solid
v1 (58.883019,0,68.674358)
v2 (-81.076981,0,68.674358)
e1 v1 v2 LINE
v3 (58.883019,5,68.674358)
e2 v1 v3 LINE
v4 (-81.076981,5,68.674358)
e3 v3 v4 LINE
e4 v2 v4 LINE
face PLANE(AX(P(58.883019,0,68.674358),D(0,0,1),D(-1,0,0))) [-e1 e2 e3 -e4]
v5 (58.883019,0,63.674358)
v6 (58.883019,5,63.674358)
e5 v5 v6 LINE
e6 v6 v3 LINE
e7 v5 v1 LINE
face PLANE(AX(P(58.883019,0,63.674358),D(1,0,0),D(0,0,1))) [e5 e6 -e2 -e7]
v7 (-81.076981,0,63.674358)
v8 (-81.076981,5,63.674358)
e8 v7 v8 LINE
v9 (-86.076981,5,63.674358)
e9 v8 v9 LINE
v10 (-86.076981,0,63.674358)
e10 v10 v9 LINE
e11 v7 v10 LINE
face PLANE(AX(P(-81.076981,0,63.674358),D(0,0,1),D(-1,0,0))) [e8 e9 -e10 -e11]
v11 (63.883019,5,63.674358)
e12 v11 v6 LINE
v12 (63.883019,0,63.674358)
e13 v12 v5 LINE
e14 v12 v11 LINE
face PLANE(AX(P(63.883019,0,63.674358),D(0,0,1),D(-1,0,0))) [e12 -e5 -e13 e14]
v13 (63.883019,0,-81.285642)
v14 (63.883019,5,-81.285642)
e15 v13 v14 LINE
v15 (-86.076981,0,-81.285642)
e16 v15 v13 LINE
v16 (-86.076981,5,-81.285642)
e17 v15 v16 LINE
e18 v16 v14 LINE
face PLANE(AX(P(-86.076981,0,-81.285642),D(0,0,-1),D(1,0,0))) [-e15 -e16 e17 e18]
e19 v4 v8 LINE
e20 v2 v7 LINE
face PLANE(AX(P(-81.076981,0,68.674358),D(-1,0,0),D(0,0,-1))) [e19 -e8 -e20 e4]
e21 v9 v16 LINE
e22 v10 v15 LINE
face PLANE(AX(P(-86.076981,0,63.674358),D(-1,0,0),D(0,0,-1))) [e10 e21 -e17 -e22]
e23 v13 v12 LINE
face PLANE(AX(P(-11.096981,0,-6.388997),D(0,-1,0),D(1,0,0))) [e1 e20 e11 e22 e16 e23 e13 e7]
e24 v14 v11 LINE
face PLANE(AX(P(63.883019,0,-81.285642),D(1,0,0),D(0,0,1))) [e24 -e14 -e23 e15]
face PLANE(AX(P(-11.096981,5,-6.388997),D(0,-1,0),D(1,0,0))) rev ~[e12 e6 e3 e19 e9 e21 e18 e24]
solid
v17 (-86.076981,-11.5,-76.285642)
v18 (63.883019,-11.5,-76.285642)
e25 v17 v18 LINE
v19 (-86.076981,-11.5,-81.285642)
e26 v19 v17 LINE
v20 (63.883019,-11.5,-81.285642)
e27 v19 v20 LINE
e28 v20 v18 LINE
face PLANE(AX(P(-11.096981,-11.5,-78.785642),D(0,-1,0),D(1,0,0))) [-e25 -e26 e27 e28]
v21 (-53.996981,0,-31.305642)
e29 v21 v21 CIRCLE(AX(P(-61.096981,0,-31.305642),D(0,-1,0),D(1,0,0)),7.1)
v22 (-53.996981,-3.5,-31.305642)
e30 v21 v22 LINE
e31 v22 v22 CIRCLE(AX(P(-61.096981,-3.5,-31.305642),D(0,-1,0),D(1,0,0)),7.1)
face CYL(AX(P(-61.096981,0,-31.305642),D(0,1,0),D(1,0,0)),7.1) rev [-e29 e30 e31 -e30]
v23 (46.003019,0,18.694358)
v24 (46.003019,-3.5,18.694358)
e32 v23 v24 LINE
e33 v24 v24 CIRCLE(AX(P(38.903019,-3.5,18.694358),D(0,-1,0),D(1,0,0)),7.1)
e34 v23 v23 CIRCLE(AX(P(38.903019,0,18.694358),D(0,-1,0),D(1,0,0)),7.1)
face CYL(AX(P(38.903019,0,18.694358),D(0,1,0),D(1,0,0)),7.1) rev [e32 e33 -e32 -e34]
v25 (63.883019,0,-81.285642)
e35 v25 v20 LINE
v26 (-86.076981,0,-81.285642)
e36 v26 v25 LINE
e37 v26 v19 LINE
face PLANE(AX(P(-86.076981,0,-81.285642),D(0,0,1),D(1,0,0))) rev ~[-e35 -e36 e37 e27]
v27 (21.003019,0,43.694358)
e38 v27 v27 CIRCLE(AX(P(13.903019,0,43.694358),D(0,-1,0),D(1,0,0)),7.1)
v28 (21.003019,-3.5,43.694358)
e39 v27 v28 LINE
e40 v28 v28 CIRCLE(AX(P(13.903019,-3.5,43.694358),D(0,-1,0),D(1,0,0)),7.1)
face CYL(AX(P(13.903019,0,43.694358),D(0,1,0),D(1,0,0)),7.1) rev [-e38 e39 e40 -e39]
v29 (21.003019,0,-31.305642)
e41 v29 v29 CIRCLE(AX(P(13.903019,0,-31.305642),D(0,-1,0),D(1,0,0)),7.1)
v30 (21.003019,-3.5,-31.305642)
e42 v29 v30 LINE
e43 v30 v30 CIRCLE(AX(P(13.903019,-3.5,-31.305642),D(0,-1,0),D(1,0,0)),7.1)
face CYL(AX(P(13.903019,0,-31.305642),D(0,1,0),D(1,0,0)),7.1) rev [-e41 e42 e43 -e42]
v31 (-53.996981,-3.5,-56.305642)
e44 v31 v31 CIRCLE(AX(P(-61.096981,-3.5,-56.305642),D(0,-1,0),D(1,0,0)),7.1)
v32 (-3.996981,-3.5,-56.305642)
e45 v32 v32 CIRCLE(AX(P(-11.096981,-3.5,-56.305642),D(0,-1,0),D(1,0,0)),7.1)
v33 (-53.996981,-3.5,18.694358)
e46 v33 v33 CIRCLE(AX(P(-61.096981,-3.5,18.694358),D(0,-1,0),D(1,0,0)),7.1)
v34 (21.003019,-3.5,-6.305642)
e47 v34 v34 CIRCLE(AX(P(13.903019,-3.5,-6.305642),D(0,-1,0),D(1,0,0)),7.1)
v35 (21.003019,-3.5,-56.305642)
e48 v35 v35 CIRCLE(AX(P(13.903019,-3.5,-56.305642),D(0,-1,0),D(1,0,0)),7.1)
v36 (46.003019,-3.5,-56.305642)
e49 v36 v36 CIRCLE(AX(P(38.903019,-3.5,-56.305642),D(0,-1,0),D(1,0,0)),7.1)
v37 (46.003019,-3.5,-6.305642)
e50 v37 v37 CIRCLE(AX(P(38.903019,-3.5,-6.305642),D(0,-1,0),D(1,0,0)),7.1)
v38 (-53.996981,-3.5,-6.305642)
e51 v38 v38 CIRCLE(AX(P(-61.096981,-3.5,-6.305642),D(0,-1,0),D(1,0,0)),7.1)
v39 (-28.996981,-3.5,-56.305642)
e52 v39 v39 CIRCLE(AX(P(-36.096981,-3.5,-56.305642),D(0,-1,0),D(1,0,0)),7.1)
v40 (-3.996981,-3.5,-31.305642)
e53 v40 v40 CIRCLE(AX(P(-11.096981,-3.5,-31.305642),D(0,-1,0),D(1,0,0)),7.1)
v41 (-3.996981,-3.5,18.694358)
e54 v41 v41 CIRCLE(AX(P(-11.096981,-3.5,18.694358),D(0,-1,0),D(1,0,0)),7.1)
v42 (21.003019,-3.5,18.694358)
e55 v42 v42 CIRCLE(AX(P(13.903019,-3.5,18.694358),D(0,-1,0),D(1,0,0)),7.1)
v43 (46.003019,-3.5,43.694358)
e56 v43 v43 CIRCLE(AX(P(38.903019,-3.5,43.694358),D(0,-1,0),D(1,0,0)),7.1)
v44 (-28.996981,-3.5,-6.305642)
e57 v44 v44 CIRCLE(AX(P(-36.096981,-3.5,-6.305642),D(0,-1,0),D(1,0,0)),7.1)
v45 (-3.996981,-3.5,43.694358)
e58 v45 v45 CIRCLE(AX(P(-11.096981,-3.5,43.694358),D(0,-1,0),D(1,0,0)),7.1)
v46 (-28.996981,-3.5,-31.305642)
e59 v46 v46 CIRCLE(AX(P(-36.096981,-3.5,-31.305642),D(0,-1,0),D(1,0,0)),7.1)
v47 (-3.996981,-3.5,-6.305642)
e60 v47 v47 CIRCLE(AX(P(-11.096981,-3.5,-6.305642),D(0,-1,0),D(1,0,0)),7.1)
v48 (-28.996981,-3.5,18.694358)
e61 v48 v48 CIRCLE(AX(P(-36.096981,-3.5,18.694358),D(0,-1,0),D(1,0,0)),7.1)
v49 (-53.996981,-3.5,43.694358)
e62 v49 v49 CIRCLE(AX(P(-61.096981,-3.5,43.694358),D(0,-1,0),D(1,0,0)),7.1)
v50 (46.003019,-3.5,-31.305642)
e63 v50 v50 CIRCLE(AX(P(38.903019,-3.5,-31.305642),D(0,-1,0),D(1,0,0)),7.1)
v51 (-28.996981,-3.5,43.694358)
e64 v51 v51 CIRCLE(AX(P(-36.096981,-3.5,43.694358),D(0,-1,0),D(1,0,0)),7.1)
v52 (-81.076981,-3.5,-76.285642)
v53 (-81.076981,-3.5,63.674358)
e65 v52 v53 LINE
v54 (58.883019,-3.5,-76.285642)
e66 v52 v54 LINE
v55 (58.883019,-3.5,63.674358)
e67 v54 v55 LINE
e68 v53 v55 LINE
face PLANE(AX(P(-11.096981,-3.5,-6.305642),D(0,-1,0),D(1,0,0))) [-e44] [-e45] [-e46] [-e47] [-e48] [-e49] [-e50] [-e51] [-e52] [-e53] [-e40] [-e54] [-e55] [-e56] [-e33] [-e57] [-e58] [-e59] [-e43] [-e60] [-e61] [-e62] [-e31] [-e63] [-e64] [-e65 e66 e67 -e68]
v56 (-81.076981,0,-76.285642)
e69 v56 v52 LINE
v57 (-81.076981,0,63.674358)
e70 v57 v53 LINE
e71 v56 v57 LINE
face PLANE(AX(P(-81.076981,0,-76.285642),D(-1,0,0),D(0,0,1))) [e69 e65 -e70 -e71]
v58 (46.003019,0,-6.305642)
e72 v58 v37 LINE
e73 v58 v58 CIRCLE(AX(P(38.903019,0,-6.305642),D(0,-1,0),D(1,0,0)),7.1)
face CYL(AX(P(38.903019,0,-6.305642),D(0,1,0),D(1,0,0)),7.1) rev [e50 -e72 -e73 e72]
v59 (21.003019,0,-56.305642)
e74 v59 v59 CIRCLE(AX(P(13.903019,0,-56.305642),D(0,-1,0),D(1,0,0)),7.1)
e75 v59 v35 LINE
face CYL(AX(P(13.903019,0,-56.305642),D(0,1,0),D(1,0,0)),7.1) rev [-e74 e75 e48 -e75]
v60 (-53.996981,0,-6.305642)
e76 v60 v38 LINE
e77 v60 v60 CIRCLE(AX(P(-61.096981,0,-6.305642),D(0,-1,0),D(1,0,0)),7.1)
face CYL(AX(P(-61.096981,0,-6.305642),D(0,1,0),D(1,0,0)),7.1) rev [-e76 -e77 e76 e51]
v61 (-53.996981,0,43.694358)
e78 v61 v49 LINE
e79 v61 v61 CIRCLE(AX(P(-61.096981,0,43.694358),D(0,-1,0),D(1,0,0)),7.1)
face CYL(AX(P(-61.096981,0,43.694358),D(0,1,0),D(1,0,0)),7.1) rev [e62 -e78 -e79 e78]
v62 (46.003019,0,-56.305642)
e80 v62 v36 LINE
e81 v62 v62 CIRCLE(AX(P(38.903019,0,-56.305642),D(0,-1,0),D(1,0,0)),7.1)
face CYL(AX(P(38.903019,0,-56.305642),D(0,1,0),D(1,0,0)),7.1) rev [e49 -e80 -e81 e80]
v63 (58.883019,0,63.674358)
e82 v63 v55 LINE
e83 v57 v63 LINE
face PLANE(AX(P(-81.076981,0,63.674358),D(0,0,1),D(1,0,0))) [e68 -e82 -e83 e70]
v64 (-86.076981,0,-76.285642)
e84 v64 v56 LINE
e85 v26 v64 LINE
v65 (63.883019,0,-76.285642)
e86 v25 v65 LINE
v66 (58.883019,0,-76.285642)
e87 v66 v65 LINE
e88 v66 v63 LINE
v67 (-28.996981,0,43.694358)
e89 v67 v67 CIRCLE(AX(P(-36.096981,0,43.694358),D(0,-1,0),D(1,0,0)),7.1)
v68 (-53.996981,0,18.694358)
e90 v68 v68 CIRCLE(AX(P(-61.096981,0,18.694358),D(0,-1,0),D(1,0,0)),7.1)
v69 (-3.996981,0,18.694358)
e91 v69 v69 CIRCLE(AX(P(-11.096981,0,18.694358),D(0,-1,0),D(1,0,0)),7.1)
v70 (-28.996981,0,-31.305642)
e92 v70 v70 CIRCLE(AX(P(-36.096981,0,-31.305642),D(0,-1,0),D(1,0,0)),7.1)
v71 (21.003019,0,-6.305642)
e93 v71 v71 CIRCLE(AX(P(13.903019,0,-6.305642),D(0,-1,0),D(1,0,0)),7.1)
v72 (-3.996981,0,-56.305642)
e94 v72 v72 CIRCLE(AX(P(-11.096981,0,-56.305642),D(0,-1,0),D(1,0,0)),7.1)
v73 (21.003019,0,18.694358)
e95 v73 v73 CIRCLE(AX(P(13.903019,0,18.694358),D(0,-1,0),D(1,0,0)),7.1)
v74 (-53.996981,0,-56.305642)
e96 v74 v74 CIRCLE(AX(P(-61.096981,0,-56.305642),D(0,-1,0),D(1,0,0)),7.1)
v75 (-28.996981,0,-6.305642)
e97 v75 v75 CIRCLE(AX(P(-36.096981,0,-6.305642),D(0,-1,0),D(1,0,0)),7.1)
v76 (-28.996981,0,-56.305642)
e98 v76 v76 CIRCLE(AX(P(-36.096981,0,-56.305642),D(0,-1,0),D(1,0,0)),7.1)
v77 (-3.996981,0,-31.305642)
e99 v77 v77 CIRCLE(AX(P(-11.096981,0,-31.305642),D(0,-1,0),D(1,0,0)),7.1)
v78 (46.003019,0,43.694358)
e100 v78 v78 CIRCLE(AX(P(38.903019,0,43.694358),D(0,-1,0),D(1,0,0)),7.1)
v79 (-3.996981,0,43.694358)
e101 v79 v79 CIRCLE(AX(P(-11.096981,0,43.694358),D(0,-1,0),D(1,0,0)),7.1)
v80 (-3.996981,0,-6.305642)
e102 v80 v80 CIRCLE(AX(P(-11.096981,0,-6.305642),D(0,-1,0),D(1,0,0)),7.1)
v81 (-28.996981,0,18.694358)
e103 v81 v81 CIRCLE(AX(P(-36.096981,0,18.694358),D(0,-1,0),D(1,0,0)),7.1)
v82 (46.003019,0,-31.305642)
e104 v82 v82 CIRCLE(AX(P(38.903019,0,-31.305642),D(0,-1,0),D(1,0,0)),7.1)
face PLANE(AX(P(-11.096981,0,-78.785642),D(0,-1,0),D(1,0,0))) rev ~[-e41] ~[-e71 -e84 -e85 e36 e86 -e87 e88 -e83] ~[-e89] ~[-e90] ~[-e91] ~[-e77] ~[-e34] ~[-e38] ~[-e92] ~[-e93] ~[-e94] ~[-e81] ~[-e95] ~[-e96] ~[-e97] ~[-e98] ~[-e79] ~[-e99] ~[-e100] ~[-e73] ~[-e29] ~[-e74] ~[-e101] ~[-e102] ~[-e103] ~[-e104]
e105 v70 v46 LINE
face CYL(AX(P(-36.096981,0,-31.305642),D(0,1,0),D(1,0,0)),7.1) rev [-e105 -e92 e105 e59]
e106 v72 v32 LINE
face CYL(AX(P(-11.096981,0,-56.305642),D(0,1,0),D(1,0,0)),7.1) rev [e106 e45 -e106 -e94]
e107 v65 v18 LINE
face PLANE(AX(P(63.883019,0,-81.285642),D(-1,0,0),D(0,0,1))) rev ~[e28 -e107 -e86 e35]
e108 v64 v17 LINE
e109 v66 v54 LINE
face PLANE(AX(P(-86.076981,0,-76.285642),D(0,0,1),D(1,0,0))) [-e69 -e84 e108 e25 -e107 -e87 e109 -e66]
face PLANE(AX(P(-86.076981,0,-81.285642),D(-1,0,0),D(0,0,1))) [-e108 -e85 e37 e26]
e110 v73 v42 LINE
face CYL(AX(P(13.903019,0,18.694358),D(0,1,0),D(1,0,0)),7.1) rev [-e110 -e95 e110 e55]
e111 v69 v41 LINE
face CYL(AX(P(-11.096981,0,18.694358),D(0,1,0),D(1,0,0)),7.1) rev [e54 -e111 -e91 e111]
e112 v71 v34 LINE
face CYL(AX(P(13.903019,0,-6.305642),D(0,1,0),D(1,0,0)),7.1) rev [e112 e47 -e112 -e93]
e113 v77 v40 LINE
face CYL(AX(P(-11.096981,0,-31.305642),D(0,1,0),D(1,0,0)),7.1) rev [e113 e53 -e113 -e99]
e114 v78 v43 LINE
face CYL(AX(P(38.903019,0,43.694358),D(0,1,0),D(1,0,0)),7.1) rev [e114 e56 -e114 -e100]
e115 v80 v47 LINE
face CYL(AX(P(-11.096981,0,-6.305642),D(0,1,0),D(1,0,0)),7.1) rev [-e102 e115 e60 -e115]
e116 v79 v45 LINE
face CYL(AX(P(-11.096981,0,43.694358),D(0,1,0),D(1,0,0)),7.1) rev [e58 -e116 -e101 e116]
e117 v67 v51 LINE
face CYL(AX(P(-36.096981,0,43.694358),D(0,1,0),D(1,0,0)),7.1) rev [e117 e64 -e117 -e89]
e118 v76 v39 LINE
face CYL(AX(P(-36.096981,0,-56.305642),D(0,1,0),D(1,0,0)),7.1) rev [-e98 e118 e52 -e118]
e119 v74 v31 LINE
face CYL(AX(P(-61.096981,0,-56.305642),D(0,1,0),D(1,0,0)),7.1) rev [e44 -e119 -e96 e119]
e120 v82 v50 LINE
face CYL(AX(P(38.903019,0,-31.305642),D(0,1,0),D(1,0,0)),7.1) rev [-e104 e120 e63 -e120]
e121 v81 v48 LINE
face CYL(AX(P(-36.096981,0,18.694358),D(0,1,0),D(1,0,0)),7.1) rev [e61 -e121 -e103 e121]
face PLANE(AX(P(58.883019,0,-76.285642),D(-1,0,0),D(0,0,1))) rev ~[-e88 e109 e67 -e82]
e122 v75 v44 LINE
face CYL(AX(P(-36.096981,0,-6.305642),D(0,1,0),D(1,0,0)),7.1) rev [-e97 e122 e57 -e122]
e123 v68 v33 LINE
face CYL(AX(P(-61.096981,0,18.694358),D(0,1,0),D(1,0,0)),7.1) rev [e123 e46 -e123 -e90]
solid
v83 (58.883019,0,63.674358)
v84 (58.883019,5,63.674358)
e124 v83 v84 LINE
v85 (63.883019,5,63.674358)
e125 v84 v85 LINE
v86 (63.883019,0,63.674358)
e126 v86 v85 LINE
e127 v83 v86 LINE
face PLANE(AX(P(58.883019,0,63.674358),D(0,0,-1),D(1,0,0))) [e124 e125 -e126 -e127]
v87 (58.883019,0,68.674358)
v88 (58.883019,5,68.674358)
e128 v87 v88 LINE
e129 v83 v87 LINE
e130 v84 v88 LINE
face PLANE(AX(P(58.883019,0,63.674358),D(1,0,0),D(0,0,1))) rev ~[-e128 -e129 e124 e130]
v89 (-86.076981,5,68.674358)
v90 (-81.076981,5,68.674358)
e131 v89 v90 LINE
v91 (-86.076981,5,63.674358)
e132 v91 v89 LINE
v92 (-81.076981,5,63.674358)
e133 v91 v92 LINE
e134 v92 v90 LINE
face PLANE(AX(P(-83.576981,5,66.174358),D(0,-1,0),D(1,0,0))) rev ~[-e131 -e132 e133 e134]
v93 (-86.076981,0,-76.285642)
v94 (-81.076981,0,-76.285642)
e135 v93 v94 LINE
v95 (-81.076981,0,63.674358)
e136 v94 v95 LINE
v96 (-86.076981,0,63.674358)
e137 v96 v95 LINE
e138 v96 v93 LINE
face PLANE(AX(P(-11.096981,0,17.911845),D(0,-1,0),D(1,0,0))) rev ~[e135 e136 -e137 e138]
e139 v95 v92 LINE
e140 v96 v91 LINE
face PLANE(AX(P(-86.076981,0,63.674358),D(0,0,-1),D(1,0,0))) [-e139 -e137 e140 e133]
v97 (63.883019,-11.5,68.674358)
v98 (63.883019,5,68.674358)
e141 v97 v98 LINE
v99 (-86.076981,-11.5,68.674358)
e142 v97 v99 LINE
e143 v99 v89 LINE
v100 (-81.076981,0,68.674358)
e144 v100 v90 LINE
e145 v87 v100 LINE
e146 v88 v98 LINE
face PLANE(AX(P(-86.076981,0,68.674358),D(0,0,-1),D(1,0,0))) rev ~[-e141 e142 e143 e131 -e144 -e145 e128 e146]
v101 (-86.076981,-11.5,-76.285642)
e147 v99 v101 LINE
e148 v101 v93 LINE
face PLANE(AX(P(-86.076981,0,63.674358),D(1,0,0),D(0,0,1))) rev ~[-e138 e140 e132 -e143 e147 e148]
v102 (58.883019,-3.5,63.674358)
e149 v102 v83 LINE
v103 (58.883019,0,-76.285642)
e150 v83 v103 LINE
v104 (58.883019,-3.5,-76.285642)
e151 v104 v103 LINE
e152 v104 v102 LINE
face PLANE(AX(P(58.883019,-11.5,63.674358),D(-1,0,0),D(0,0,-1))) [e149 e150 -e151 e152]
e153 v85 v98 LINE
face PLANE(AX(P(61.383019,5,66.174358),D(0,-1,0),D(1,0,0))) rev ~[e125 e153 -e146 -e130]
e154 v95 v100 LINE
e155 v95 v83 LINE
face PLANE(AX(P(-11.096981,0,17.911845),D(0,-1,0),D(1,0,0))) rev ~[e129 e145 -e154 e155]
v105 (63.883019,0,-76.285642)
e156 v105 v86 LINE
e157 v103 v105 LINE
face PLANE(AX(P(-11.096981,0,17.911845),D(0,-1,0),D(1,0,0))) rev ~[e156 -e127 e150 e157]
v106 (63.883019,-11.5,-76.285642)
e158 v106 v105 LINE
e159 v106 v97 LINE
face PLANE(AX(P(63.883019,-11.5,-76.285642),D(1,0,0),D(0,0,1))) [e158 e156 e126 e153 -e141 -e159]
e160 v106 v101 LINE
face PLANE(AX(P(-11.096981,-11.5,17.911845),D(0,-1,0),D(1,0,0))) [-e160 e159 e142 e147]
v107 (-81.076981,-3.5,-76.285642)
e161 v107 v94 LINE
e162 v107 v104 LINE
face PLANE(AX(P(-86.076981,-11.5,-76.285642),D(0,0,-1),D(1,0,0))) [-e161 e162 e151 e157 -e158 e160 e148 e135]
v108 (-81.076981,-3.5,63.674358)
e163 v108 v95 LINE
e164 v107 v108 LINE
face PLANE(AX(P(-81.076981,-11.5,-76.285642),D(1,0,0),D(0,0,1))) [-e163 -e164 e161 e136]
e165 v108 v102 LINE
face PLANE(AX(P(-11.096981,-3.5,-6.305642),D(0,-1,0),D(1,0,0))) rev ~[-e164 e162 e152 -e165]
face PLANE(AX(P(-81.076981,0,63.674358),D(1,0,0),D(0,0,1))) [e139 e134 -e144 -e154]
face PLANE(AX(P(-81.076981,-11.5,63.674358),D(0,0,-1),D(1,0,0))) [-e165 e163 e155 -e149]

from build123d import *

# Parameters (mm, degrees)
F0_W      = 139.96
F0_H      = 139.96
F0_R      = 7.1
F1_DEPTH  = 3.5
F3_W      = 139.96
F3_H      = 139.96
F4_DEPTH  = 8
F7_DEPTH  = 11.5
F8_W      = 149.96
F8_H      = 5
F9_DEPTH  = 11.5
F10_W     = 5
F10_H     = 5
F11_DEPTH = 5
F13_DEPTH = 5


with BuildPart() as f1:
    # F0 (on Front) → F1 (new body)
    with BuildSketch(Plane.XZ):
        with Locations((-11.0969811678, -6.305641681)):
            Rectangle(F0_W, F0_H)
        with Locations((-61.0969811678, -56.305641681)):
            Circle(F0_R, mode=Mode.SUBTRACT)
        with Locations((-36.0969811678, -56.305641681)):
            Circle(F0_R, mode=Mode.SUBTRACT)
        with Locations((-61.0969811678, -31.305641681)):
            Circle(F0_R, mode=Mode.SUBTRACT)
        with Locations((-36.0969811678, -31.305641681)):
            Circle(F0_R, mode=Mode.SUBTRACT)
        with Locations((-11.0969811678, -56.305641681)):
            Circle(F0_R, mode=Mode.SUBTRACT)
        with Locations((13.9030188322, -56.305641681)):
            Circle(F0_R, mode=Mode.SUBTRACT)
        with Locations((38.9030188322, -56.305641681)):
            Circle(F0_R, mode=Mode.SUBTRACT)
        with Locations((-11.0969811678, -31.305641681)):
            Circle(F0_R, mode=Mode.SUBTRACT)
        with Locations((13.9030188322, -31.305641681)):
            Circle(F0_R, mode=Mode.SUBTRACT)
        with Locations((38.9030188322, -31.305641681)):
            Circle(F0_R, mode=Mode.SUBTRACT)
        with Locations((-61.0969811678, -6.305641681)):
            Circle(F0_R, mode=Mode.SUBTRACT)
        with Locations((-61.0969811678, 18.694358319)):
            Circle(F0_R, mode=Mode.SUBTRACT)
        with Locations((-36.0969811678, -6.305641681)):
            Circle(F0_R, mode=Mode.SUBTRACT)
        with Locations((-36.0969811678, 18.694358319)):
            Circle(F0_R, mode=Mode.SUBTRACT)
        with Locations((-61.0969811678, 43.694358319)):
            Circle(F0_R, mode=Mode.SUBTRACT)
        with Locations((-36.0969811678, 43.694358319)):
            Circle(F0_R, mode=Mode.SUBTRACT)
        with Locations((-11.0969811678, -6.305641681)):
            Circle(F0_R, mode=Mode.SUBTRACT)
        with Locations((13.9030188322, -6.305641681)):
            Circle(F0_R, mode=Mode.SUBTRACT)
        with Locations((-11.0969811678, 18.694358319)):
            Circle(F0_R, mode=Mode.SUBTRACT)
        with Locations((13.9030188322, 18.694358319)):
            Circle(F0_R, mode=Mode.SUBTRACT)
        with Locations((38.9030188322, -6.305641681)):
            Circle(F0_R, mode=Mode.SUBTRACT)
        with Locations((38.9030188322, 18.694358319)):
            Circle(F0_R, mode=Mode.SUBTRACT)
        with Locations((-11.0969811678, 43.694358319)):
            Circle(F0_R, mode=Mode.SUBTRACT)
        with Locations((13.9030188322, 43.694358319)):
            Circle(F0_R, mode=Mode.SUBTRACT)
        with Locations((38.9030188322, 43.694358319)):
            Circle(F0_R, mode=Mode.SUBTRACT)
    extrude(amount=F1_DEPTH)

    # F8 (on Front) → F9 (join)
    with BuildSketch(Plane.XZ):
        with Locations((-11.0969811678, -78.785641681)):
            Rectangle(F8_W, F8_H)
    extrude(amount=F9_DEPTH)


with BuildPart() as f4:
    # F3 (on offset) → F4 (new body)
    with BuildSketch(Plane.XZ.offset(3.5)):
        with Locations((-11.0969811678, -6.305641681)):
            Rectangle(F3_W, F3_H)
    extrude(amount=F4_DEPTH)

    # F6 (on offset) → F7 (join)
    with BuildSketch(Plane.XZ.offset(11.5)):
        Polygon((-81.0769811678, -76.285641681), (-81.0769811678, 63.674358319), (58.8830188322, 63.674358319), (58.8830188322, -76.285641681), (63.8830188322, -76.285641681), (63.8830188322, 68.674358319), (-86.0769811678, 68.674358319), (-86.0769811678, -76.285641681), align=None)
    extrude(amount=-F7_DEPTH)

    # F10 (on Front) → F11 (join)
    with BuildSketch(Plane.XZ):
        with Locations((-83.5769811678, 66.174358319)):
            Rectangle(F10_W, F10_H)
        with Locations((61.3830188322, 66.174358319)):
            Rectangle(F10_W, F10_H)
    extrude(amount=-F11_DEPTH)


with BuildPart() as f13:
    # F12 (on Front) → F13 (new body)
    with BuildSketch(Plane.XZ):
        Polygon((58.8830188322, 63.674358319), (58.8830188322, 68.674358319), (-81.0769811678, 68.674358319), (-81.0769811678, 63.674358319), (-86.0769811678, 63.674358319), (-86.0769811678, -81.285641681), (63.8830188322, -81.285641681), (63.8830188322, 63.674358319), align=None)
    extrude(amount=-F13_DEPTH)


solid = Compound([f1.part, f4.part, f13.part])
